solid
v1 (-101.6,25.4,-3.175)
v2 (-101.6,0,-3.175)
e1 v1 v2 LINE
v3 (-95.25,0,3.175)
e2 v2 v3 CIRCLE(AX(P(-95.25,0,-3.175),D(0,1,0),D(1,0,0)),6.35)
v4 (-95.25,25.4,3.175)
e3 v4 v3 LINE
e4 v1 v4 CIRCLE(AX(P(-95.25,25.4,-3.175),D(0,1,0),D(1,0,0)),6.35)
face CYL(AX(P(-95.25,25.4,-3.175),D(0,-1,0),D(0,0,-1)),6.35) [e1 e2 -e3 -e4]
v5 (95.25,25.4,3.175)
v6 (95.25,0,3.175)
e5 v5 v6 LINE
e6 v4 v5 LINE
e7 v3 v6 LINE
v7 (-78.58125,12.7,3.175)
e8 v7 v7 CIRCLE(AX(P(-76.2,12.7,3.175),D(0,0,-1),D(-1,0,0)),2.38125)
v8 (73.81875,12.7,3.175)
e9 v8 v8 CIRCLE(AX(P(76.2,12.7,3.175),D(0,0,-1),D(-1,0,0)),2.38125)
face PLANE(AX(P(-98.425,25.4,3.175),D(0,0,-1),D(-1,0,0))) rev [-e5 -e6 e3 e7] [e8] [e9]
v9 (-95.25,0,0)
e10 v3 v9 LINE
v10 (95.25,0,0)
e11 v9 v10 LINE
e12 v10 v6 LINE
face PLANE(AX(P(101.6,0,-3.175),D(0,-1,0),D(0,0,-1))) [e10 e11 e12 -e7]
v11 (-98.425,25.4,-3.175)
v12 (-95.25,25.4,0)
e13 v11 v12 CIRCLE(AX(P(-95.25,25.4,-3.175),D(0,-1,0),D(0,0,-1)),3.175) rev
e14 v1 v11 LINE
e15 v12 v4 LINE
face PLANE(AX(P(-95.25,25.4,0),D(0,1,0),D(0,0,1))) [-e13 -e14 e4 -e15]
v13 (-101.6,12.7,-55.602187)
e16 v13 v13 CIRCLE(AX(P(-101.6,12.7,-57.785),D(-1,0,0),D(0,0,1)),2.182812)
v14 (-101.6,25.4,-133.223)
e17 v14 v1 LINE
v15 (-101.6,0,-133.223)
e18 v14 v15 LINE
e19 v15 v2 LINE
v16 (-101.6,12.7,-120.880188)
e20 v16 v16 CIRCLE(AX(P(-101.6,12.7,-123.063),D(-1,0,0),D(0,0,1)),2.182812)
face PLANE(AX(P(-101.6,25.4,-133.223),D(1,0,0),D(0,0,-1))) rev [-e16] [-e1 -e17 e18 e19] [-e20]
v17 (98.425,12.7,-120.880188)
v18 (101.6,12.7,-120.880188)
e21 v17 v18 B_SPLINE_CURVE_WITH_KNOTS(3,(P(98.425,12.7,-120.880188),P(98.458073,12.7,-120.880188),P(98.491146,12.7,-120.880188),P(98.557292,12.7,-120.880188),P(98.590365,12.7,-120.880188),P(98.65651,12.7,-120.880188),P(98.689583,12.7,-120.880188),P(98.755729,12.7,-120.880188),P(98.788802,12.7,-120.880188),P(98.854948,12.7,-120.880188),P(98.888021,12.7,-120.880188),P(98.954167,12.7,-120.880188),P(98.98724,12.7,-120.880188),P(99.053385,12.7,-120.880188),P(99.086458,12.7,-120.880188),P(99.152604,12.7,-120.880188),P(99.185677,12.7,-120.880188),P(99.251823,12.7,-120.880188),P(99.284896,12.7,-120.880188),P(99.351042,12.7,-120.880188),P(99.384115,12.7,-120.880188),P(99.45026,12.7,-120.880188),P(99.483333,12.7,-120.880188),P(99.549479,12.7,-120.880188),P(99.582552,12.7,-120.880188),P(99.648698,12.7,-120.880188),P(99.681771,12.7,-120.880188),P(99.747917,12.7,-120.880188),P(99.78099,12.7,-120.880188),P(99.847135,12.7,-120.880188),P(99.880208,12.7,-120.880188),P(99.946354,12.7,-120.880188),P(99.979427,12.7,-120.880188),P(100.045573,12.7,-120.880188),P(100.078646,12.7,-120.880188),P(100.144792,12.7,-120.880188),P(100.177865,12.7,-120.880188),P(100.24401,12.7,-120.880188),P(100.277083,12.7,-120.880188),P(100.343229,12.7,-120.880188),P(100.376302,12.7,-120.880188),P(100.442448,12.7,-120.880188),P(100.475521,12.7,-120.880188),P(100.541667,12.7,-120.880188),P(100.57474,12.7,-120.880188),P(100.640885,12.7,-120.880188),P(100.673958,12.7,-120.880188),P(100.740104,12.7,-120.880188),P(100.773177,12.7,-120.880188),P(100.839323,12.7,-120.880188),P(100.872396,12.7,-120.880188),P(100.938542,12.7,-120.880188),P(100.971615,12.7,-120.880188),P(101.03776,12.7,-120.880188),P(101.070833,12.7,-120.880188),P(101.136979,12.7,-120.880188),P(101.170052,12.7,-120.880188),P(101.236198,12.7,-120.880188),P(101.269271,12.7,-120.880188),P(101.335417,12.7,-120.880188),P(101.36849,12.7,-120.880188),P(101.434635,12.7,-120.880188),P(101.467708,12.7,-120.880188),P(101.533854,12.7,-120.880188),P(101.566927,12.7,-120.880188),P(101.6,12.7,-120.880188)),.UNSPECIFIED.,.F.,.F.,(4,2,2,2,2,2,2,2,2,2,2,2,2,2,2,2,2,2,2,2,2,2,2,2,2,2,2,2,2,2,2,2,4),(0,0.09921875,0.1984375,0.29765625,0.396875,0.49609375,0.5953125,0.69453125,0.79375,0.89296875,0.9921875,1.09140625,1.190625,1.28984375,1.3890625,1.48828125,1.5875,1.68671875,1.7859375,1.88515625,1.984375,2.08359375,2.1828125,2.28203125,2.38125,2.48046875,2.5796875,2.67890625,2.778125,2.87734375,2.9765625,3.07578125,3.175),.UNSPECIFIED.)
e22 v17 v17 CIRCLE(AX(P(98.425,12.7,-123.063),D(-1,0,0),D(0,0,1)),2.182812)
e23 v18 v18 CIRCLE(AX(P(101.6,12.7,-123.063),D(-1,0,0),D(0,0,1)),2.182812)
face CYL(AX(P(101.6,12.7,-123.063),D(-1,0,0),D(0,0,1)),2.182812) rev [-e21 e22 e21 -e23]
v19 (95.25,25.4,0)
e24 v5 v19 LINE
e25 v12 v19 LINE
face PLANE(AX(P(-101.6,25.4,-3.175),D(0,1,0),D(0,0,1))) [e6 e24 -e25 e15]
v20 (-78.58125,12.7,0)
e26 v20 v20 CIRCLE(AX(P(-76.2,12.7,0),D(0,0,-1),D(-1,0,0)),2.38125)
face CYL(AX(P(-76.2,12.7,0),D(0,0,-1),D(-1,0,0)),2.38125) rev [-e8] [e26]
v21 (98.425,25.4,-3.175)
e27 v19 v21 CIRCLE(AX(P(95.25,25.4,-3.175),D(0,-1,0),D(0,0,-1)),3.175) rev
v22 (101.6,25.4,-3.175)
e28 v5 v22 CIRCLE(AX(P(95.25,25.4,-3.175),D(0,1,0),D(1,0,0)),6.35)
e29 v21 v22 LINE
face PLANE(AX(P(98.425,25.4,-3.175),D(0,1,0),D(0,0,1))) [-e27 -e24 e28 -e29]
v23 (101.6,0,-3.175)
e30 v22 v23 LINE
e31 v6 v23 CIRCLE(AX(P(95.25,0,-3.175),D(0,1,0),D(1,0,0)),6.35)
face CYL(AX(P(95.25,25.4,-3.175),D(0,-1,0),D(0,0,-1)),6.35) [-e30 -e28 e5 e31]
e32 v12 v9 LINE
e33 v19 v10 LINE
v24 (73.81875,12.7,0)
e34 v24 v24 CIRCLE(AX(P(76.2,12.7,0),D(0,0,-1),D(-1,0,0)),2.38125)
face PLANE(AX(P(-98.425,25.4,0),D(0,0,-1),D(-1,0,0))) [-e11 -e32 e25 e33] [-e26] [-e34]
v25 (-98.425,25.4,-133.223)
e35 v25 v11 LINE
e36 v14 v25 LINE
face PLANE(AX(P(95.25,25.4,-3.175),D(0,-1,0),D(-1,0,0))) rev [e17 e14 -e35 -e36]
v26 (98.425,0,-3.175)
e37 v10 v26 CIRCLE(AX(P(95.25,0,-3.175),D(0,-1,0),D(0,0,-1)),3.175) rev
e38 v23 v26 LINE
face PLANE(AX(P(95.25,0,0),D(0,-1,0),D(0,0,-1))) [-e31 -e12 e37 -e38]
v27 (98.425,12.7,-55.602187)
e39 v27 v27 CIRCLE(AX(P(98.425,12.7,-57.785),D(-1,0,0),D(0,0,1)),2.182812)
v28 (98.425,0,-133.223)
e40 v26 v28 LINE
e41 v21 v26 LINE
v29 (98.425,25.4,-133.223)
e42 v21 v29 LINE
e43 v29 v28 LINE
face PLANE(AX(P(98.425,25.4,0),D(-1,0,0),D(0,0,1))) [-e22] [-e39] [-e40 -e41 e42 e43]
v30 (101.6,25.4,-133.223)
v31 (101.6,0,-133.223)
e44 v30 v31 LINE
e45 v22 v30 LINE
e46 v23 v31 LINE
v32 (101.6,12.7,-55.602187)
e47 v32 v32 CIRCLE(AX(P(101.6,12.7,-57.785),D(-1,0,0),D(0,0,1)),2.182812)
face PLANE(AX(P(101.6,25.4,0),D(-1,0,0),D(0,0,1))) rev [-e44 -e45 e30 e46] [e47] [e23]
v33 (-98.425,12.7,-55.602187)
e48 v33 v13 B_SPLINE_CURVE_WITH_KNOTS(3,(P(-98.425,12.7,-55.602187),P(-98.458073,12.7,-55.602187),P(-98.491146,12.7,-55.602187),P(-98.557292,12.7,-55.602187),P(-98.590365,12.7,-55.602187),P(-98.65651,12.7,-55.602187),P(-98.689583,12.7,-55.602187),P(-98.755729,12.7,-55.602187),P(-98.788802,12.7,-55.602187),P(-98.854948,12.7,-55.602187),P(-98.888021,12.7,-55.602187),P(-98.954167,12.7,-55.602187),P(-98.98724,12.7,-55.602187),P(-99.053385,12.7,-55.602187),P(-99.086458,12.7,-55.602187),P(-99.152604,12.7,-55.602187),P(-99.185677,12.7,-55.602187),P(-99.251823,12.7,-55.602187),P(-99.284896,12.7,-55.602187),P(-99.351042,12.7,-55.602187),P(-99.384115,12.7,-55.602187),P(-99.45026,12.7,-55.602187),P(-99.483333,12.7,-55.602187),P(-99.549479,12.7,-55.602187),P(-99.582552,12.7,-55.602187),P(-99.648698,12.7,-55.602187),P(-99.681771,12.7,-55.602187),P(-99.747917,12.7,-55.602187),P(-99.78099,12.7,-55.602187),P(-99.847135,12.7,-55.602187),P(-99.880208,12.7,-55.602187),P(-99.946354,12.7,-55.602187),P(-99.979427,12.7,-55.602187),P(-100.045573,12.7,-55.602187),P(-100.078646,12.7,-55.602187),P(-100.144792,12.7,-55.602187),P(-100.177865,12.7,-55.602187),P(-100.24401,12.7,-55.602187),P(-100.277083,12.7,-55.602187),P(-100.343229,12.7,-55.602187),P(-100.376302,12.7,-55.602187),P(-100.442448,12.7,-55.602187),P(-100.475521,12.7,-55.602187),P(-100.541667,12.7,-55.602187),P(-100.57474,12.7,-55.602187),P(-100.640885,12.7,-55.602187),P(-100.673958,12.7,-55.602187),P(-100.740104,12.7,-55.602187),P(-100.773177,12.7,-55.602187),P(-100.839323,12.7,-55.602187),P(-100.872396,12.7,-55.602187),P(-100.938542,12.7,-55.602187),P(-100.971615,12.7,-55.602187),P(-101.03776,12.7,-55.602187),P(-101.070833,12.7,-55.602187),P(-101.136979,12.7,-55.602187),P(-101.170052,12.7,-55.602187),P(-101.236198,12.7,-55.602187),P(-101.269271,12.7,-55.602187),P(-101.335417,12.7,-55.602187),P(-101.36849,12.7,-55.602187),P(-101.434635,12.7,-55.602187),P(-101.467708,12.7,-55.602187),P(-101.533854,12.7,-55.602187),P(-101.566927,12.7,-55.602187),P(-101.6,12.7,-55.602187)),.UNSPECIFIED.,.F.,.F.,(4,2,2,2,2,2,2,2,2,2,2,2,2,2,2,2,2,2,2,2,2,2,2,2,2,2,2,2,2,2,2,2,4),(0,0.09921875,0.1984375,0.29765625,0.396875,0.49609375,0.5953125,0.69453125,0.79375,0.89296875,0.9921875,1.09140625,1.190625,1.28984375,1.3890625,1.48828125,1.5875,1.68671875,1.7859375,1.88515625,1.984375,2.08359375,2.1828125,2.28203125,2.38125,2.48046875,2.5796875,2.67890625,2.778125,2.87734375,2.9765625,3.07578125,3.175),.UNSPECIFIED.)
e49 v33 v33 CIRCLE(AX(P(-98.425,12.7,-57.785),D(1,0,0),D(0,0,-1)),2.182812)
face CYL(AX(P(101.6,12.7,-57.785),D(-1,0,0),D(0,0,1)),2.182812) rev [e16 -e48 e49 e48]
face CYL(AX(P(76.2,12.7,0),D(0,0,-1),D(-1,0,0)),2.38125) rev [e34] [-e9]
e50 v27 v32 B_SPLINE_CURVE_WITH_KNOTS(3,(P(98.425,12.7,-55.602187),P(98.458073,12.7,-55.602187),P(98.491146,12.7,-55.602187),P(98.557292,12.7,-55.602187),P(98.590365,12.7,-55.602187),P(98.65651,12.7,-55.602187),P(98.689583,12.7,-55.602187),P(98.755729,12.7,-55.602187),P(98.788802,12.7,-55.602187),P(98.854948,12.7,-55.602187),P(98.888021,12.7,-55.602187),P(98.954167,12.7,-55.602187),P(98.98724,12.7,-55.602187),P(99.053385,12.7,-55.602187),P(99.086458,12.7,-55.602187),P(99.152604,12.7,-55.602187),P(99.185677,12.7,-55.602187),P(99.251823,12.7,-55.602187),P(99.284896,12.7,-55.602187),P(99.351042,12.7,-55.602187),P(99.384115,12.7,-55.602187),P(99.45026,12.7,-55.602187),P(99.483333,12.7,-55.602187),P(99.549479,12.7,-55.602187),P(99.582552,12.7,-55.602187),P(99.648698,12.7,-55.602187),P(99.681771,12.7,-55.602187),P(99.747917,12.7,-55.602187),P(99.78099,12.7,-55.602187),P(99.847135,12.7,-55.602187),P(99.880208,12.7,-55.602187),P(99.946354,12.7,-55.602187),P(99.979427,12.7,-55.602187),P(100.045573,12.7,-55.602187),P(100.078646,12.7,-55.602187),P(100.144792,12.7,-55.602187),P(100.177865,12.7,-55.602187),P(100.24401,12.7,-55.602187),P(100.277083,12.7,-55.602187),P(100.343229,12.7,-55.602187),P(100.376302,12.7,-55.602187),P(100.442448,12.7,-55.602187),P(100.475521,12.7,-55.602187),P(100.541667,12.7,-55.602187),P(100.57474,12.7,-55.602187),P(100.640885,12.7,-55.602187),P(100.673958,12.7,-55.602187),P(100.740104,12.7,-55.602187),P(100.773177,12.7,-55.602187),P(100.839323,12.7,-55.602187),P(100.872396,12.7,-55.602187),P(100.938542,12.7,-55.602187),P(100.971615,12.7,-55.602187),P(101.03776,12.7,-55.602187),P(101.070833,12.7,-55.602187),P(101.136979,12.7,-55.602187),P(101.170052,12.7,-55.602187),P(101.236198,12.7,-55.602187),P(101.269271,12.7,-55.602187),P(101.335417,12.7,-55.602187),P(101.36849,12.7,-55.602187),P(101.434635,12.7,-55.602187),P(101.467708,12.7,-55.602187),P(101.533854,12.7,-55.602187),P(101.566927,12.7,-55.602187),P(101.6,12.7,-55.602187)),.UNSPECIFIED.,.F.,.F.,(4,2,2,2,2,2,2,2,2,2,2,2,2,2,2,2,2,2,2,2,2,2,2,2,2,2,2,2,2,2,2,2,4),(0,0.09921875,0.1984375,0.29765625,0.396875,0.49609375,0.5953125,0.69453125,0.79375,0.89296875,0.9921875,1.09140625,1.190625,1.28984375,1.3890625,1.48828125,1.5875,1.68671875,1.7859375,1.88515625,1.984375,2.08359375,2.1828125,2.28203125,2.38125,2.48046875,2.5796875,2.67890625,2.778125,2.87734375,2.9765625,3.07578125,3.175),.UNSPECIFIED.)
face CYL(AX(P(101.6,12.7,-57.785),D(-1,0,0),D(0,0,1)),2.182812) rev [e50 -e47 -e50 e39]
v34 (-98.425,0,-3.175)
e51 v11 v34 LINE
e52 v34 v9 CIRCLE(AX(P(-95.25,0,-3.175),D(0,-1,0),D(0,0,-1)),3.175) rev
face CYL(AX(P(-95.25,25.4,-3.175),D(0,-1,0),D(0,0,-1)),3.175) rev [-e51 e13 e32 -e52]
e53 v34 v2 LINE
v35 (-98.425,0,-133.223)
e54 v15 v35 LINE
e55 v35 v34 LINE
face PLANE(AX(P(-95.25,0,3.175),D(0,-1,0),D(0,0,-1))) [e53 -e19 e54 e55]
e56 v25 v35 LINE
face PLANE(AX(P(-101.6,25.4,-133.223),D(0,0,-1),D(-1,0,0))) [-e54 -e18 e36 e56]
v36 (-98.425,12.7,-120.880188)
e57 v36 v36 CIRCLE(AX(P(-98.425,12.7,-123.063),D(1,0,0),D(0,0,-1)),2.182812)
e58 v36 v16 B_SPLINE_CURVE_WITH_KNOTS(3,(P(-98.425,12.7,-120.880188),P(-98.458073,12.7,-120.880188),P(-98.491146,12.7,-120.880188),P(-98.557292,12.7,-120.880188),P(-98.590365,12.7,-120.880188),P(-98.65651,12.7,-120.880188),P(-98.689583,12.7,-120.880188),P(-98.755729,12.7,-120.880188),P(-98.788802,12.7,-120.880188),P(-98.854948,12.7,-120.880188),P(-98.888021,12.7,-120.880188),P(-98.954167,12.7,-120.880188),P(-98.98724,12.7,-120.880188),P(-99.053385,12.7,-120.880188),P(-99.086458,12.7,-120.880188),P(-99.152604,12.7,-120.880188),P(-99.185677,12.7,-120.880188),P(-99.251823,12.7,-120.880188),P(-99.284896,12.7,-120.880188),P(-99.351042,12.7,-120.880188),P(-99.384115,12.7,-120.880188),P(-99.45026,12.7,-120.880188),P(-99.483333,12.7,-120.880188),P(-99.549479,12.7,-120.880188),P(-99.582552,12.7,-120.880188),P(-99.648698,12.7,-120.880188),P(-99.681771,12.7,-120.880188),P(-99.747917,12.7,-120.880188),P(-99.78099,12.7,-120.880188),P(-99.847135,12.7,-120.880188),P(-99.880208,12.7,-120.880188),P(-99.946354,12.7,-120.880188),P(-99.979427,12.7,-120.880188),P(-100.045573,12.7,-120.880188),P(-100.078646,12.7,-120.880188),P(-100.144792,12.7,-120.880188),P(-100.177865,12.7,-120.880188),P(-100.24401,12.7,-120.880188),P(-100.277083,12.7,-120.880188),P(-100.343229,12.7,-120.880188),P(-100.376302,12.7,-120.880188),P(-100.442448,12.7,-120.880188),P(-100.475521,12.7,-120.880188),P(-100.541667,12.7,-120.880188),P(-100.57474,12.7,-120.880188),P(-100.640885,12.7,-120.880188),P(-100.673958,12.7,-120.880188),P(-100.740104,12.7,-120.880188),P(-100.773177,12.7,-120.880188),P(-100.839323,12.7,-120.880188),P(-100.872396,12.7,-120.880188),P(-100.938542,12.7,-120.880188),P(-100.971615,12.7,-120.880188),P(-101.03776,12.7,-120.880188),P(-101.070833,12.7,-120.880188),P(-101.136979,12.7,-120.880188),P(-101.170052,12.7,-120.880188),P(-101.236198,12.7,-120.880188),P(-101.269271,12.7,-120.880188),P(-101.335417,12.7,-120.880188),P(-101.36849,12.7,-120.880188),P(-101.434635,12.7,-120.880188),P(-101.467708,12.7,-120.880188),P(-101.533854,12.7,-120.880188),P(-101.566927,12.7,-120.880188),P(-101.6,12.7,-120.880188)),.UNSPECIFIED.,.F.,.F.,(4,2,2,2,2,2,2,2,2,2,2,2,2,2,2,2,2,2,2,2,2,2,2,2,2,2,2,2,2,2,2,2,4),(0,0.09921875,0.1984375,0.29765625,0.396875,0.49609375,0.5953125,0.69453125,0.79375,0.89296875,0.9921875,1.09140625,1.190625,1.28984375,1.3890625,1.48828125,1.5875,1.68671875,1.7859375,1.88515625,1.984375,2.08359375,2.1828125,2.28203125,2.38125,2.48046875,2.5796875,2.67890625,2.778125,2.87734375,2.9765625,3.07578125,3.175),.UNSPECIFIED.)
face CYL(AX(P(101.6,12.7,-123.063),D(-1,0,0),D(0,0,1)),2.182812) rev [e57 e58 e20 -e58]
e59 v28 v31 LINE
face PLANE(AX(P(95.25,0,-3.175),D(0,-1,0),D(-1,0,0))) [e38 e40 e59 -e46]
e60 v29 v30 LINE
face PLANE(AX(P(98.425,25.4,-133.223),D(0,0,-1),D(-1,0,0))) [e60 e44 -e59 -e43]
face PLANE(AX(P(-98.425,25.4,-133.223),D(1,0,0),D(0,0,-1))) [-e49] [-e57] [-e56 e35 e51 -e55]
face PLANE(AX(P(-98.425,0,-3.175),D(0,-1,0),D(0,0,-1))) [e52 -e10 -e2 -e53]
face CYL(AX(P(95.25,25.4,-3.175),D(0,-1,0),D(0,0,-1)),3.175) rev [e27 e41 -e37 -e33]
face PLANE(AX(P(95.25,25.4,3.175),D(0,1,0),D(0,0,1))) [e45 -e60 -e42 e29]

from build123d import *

# Parameters (mm, degrees)
BASE_FLANGE1_DEPTH         = 25.4
F_1_8_0_1250_DOWEL_HOLE1_D = 4.7625
CUT_EXTRUDE1_DEPTH         = 242.668219578
CUT_EXTRUDE1_DEPTH_BACK    = 242.668219578
SKETCH8_R                  = 2.1828125


# Sheet-metal steps are written as plain solids
with BuildPart() as part:
    # Sketch1 → Base-Flange1 (new body)
    with BuildSketch(Plane(origin=(0, 0, 0), x_dir=(1, 0, 0), z_dir=(0, 1, 0))):
        with BuildLine():
            Line((-98.425, 133.223), (-98.425, 3.175))
            ThreePointArc((-98.425, 3.175), (-97.49506403, 0.92993597), (-95.25, 0))
            Line((-95.25, 0), (95.25, 0))
            ThreePointArc((95.25, 0), (97.49506403, 0.92993597), (98.425, 3.175))
            Line((98.425, 3.175), (98.425, 133.223))
            Line((98.425, 133.223), (101.6, 133.223))
            Line((101.6, 133.223), (101.6, 3.175))
            ThreePointArc((101.6, 3.175), (99.740128061, -1.315128061), (95.25, -3.175))
            Line((95.25, -3.175), (-95.25, -3.175))
            ThreePointArc((-95.25, -3.175), (-99.740128061, -1.315128061), (-101.6, 3.175))
            Line((-101.6, 3.175), (-101.6, 133.223))
            Line((-101.6, 133.223), (-98.425, 133.223))
        make_face()
    extrude(amount=BASE_FLANGE1_DEPTH)

    # 1/8 (0.1250) Dowel Hole1 (through all)
    with Locations(Plane(origin=(0, 0, 0), x_dir=(-1, 0, 0), z_dir=(0, 0, -1))):
        with Locations((76.2, 12.7), (-76.2, 12.7)):
            Hole(F_1_8_0_1250_DOWEL_HOLE1_D / 2)

    # Sketch8 → Cut-Extrude1 (cut, two sides: drawn at the far end of the back side and taken through both)
    with BuildSketch(Plane.ZY.offset(-98.425).offset(-CUT_EXTRUDE1_DEPTH_BACK)):
        with Locations((-57.785, 12.7)):
            Circle(SKETCH8_R)
        with Locations((-123.063, 12.7)):
            Circle(SKETCH8_R)
    extrude(amount=CUT_EXTRUDE1_DEPTH + CUT_EXTRUDE1_DEPTH_BACK, mode=Mode.SUBTRACT)


solid = part.part
